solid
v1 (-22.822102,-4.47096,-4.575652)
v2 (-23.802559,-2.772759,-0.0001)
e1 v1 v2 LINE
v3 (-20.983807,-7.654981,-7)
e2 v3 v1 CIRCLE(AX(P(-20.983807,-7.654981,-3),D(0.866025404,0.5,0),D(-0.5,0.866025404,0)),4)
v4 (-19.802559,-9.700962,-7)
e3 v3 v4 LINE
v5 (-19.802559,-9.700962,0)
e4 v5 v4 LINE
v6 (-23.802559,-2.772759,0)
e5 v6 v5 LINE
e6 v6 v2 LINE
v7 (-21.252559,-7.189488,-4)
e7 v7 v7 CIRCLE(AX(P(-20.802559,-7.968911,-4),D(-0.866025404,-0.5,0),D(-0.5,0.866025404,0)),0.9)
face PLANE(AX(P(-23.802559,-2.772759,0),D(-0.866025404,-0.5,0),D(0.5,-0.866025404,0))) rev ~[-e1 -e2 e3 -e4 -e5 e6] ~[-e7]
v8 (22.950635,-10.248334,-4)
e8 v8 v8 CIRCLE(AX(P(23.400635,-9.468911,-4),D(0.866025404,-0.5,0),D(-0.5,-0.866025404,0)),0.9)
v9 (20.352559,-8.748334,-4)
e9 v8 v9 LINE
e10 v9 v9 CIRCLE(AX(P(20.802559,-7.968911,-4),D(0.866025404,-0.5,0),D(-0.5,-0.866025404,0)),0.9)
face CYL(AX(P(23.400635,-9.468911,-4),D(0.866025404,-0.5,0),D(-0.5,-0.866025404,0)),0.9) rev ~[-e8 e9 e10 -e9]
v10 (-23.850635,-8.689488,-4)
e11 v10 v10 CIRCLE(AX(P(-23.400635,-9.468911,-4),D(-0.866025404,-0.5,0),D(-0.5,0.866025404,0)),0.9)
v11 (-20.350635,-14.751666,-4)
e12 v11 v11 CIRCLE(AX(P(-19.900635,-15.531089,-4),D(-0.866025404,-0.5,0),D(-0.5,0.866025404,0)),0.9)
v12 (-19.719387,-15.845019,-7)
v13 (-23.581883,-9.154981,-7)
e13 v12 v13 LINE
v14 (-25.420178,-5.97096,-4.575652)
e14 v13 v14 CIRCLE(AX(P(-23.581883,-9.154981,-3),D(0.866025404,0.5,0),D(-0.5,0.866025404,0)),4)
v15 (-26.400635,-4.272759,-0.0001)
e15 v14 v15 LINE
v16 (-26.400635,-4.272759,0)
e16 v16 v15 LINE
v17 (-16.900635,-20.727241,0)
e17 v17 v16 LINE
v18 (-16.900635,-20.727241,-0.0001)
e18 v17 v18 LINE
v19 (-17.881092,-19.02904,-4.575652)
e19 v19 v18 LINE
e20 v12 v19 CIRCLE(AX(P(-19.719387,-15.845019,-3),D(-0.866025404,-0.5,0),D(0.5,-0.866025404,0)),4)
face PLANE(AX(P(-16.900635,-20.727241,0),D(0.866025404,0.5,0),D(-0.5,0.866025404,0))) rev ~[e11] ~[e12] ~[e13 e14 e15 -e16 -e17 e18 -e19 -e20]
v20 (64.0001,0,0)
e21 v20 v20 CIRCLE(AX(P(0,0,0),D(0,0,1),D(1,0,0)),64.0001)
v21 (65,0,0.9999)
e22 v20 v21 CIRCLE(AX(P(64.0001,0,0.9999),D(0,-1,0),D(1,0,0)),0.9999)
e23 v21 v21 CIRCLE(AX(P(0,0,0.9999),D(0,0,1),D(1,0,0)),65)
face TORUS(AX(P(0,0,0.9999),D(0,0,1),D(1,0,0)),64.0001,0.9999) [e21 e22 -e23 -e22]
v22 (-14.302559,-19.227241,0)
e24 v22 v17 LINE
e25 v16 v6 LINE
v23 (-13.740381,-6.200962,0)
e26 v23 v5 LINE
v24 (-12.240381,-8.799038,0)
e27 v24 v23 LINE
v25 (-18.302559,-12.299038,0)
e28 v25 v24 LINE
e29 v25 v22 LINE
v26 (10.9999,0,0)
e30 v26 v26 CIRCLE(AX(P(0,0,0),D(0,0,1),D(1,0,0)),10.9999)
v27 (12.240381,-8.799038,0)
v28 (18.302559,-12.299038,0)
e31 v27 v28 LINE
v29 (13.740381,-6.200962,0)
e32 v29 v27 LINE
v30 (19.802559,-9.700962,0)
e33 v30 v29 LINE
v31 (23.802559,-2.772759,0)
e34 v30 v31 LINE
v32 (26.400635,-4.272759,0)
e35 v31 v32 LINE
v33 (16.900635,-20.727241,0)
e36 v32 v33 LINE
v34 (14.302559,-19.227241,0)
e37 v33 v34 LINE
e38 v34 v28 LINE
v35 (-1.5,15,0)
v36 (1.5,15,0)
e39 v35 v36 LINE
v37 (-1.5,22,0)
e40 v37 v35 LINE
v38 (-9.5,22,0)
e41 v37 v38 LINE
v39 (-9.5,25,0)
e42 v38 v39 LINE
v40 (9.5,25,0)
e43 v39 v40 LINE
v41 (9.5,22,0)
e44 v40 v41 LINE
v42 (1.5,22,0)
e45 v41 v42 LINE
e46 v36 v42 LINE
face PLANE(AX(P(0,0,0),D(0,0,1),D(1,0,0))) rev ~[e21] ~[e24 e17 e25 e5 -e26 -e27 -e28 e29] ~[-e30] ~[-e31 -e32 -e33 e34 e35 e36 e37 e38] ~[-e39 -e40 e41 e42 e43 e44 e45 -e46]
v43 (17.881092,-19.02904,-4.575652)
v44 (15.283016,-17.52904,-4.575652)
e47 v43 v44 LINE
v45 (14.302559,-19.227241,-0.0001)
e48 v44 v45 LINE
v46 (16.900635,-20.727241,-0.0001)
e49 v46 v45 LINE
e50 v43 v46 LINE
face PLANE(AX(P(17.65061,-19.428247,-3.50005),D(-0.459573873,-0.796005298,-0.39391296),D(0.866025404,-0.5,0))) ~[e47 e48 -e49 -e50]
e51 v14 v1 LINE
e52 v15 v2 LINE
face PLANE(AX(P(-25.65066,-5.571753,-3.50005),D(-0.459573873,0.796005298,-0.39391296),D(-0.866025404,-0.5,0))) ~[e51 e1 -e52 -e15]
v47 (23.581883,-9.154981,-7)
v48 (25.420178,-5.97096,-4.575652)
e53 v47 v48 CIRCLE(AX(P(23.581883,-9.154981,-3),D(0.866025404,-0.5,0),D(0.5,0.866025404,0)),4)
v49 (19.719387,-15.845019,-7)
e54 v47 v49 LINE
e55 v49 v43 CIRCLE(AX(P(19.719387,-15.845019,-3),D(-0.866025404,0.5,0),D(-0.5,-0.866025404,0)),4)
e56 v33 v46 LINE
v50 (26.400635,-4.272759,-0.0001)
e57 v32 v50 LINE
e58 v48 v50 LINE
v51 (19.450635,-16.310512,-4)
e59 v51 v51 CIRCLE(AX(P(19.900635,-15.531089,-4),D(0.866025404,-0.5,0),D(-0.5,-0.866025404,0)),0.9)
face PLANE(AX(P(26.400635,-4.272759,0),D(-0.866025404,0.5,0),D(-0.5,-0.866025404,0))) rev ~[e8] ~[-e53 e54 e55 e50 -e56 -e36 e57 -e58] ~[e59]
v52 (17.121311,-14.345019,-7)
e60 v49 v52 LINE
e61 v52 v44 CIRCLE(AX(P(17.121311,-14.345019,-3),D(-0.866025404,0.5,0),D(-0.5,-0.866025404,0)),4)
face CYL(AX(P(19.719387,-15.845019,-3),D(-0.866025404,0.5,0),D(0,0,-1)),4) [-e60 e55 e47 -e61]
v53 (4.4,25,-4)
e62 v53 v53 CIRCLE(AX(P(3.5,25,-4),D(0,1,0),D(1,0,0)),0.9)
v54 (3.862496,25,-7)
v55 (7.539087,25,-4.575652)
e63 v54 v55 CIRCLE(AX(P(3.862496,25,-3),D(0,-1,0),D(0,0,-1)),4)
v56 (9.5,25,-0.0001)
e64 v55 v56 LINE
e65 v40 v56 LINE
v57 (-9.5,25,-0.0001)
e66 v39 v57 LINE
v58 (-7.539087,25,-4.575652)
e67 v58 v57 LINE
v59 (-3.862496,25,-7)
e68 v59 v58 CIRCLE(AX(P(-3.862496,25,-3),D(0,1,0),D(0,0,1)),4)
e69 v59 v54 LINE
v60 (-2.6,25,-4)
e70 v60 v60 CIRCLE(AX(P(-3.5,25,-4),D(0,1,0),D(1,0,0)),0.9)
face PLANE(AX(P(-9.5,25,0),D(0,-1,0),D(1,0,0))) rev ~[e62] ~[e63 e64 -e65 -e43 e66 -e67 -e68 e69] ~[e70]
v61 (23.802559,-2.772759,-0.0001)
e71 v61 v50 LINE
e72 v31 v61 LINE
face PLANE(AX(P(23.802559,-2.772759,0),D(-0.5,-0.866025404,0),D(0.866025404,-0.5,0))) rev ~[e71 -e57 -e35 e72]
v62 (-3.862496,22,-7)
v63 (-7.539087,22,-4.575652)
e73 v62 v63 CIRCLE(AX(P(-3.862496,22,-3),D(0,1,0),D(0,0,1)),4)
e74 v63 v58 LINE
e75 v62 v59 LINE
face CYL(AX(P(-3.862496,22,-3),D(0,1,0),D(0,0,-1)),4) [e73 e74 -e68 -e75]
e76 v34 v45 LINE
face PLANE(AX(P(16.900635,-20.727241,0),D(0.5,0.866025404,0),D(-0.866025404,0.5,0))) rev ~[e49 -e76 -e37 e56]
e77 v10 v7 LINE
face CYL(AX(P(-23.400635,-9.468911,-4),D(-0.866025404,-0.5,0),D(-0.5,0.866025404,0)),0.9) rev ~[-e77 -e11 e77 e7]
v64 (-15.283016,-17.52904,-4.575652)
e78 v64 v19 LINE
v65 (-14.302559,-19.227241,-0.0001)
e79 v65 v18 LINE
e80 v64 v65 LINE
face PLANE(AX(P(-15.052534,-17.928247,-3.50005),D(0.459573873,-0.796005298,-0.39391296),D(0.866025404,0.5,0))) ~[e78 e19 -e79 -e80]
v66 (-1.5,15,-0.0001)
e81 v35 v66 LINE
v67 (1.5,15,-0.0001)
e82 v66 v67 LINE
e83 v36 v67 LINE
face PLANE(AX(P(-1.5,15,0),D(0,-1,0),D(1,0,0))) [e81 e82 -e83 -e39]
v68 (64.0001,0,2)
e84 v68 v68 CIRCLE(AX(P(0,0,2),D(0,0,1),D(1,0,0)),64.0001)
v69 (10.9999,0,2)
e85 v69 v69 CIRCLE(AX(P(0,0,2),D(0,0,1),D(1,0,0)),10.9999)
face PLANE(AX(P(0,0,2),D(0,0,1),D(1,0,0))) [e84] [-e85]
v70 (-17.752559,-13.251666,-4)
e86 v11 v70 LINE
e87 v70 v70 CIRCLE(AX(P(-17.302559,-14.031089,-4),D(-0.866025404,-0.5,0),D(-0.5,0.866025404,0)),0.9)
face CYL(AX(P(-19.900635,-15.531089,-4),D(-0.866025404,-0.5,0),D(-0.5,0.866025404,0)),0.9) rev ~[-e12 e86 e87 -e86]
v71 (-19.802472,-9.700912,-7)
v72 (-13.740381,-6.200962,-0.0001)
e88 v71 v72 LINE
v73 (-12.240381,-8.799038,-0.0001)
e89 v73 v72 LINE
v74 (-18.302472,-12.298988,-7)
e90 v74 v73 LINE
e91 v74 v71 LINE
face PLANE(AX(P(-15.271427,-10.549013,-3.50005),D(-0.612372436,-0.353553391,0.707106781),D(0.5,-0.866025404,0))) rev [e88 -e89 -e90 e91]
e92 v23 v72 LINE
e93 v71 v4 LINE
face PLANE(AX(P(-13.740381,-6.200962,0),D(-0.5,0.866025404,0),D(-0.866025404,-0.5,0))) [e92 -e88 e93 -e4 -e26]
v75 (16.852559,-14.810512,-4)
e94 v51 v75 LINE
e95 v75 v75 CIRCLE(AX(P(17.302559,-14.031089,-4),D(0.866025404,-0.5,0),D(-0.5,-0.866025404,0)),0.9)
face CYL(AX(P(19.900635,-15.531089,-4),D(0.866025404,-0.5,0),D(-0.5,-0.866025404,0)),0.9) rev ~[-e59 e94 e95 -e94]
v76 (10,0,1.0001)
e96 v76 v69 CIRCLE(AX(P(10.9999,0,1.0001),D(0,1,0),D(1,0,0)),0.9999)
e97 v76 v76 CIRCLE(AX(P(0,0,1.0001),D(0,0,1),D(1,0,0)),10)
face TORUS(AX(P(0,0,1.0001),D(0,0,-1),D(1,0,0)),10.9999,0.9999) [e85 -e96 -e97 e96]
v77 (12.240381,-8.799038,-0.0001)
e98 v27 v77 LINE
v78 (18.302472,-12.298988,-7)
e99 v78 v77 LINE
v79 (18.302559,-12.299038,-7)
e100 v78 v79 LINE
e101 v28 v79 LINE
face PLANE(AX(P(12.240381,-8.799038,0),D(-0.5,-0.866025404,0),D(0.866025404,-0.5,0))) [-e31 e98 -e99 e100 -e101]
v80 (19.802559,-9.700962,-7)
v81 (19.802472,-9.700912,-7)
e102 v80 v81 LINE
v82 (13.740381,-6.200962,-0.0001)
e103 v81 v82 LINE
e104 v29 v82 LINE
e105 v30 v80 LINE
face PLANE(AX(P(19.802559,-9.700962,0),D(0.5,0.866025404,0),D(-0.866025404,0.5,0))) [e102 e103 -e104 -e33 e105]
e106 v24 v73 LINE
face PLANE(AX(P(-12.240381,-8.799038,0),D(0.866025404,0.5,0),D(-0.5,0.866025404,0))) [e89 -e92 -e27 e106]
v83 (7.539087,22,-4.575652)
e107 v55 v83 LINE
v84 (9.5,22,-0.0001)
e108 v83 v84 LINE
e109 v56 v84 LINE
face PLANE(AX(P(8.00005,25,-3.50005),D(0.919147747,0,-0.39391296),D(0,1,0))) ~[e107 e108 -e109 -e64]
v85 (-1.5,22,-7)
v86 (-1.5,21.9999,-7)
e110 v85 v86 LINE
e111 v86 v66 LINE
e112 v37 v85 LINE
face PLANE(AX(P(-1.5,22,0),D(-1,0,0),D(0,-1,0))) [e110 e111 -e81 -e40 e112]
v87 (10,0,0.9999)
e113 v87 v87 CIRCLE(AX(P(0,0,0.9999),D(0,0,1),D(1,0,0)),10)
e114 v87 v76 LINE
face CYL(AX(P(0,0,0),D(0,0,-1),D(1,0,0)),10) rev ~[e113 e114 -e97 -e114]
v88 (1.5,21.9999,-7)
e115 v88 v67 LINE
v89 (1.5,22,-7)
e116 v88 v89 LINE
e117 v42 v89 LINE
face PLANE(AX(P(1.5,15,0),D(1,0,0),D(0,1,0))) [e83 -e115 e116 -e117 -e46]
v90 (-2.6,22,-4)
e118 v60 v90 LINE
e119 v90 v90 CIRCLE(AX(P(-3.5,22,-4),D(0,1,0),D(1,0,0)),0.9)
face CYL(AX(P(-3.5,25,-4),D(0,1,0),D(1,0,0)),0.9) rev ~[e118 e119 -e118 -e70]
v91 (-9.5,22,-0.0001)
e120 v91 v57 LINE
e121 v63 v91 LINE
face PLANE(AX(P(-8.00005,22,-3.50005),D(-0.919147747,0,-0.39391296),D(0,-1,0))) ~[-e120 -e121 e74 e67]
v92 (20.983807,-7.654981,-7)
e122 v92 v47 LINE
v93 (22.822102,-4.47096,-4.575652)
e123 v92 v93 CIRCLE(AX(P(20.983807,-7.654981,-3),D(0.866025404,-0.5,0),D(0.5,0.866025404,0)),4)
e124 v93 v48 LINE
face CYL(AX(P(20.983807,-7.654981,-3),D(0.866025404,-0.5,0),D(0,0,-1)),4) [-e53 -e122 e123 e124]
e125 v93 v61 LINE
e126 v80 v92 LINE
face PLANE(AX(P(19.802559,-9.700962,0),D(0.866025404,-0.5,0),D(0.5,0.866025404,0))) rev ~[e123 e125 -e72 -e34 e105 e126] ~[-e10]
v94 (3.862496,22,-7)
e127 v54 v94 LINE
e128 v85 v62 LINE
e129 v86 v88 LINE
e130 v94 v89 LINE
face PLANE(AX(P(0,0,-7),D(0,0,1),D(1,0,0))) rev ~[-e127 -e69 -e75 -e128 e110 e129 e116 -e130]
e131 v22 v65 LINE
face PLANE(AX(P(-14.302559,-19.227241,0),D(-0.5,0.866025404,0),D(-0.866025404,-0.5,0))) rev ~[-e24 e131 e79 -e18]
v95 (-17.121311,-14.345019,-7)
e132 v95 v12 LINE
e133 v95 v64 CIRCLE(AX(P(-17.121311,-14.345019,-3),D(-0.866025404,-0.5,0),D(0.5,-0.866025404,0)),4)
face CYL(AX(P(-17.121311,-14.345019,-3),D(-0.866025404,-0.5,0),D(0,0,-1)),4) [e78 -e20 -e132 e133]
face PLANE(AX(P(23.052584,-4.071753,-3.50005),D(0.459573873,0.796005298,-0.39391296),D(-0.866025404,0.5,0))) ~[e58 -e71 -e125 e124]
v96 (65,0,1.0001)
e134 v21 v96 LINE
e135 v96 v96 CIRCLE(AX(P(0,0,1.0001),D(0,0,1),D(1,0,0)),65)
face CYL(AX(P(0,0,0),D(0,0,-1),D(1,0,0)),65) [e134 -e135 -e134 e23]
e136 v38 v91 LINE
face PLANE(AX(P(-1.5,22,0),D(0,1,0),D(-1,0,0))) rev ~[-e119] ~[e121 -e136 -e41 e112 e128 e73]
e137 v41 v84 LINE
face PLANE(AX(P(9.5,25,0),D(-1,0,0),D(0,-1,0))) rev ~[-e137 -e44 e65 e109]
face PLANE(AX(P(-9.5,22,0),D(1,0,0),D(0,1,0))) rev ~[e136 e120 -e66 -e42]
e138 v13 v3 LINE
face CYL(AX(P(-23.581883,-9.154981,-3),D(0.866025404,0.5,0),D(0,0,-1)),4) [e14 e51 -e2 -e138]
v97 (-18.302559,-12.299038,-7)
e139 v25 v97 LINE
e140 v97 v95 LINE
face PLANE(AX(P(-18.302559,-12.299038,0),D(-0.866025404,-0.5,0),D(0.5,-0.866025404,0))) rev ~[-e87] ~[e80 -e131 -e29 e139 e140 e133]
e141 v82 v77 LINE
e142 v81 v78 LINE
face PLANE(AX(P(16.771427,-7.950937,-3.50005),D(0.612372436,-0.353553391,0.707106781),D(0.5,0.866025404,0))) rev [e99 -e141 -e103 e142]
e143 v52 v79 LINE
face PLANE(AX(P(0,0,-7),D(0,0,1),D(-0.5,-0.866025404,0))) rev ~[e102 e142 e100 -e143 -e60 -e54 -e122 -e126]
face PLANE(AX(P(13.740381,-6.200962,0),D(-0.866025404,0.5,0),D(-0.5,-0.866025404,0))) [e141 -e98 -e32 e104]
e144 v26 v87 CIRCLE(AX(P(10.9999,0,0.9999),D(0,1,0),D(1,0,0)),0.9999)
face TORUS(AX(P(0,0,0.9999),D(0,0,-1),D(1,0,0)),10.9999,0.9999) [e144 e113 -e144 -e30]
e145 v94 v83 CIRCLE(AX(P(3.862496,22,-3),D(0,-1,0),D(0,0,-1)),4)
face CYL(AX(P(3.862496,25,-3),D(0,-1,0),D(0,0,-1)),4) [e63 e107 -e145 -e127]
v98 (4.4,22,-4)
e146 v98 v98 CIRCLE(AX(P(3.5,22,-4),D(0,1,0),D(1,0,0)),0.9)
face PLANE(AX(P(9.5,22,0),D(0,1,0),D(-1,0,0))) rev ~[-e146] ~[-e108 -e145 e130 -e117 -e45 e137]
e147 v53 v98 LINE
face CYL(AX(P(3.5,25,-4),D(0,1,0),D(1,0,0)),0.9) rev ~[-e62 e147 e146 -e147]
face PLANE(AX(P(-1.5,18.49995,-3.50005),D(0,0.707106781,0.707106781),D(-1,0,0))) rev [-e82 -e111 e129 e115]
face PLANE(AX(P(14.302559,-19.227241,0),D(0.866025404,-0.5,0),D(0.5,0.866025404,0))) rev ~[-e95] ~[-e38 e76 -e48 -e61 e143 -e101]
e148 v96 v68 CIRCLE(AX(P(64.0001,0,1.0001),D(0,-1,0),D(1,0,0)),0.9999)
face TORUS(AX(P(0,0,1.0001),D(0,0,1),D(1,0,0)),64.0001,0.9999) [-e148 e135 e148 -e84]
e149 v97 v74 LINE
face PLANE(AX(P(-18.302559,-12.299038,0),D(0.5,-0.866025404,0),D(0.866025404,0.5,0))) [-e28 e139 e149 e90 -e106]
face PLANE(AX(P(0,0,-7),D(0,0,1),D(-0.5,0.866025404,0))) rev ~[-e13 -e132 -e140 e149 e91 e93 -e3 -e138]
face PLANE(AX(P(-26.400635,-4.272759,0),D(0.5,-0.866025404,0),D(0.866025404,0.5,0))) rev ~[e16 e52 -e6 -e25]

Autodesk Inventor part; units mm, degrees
ref_plane "YZ Plane" through (0, 0, 0) normal (1, 0, 0) x (0, 1, 0)
ref_plane "XZ Plane" through (0, 0, 0) normal (0, 1, 0) x (-1, 0, 0)
ref_plane "XY Plane" through (0, 0, 0) normal (0, 0, 1) x (1, 0, 0)
sketch "Skizze1" plane through (0, 0, 0) normal (0, 0, 1) x (1, 0, 0)
  line L0 (-91, 0) -> (91, 0) construction
  circle A0 centre (0, 0) radius 65
  line L1 (-9.5, 25) -> (9.5, 25)
  line L2 (9.5, 25) -> (9.5, 22)
  line L3 (9.5, 22) -> (-9.5, 22)
  line L4 (-9.5, 22) -> (-9.5, 25)
  line L5 (1.5, 22) -> (-1.5, 22)
  line L6 (-1.5, 22) -> (-1.5, 15)
  line L7 (-1.5, 15) -> (1.5, 15)
  line L8 (1.5, 15) -> (1.5, 22)
  circle A1 centre (0, 0) radius 10
  line L9 (0, 91) -> (0, -91) construction
  dimension "d9" = 130
  dimension "d10" = 3
  dimension "d14" = 19
  dimension "d23" = 7
  dimension "d62" = 20
  dimension "d149" = 25
extrude "Extrusion3" add sketch "Skizze1" against normal blind 7 contours L1 L2 L3 L4 | L3 L8 L7 L6
chamfer "Fase2" distance 3 distance2 7 1 edges at (-9.5, 23.5, -7) measured on face at (-0.5, 24, -7)
chamfer "Fase3" distance 3 distance2 7 1 edges at (9.5, 23.5, -7) measured on face at (1.5, 24, -7)
fillet "Rundung1" radius 4 2 edges at (-6.5001, 23.5, -7) (6.5001, 23.5, -7)
sketch "Skizze2" plane through (-9.5, 25, 0) normal (0, 1, 0) x (1, 0, 0)
  circle A0 centre (6, 4) radius 0.9
  circle A1 centre (13, 4) radius 0.9
  line L0 (43, 0) -> (-27, 0) construction
  line L1 (-1.6221, 4) -> (19.0112, 4) construction
  line L2 (3, 7) -> (16, 7) construction
  line L3 (0, 0) -> (0, 3) projected
  line L4 (9.5, 8.4) -> (9.5, -1.4) construction
  point P0 (9.5, 0)
  point P1 (4, 7)
  point P2 (11, 7)
  dimension "d16" = 1.8
  dimension "d20" = 3
  dimension "d150" = 7
extrude "Extrusion4" cut sketch "Skizze2" against normal up to next
chamfer "Fase1" distance 7 distance2 7 1 edges at (0, 15, -7) measured on face at (0.5, 24, -7)
pattern_circular "Runde Anordnung1" count 3 over 360 about axis through (0, 0, -10) along (0, 0, 1) of "Extrusion4", "Extrusion3", "Fase2", "Fase3", "Rundung1", "Fase1"
extrude "Extrusion11" add sketch "Skizze1" along normal blind 2 contours A0 | L1 L2 L3 L4 | L3 L8 L7 L6
fillet "Rundung5" radius 1 4 edges at (-65, 0, 2) (-10, 0, 2) (-10, 0, 0) (-65, 0, 0)
properties part number "Stewart-Plate-Head"
